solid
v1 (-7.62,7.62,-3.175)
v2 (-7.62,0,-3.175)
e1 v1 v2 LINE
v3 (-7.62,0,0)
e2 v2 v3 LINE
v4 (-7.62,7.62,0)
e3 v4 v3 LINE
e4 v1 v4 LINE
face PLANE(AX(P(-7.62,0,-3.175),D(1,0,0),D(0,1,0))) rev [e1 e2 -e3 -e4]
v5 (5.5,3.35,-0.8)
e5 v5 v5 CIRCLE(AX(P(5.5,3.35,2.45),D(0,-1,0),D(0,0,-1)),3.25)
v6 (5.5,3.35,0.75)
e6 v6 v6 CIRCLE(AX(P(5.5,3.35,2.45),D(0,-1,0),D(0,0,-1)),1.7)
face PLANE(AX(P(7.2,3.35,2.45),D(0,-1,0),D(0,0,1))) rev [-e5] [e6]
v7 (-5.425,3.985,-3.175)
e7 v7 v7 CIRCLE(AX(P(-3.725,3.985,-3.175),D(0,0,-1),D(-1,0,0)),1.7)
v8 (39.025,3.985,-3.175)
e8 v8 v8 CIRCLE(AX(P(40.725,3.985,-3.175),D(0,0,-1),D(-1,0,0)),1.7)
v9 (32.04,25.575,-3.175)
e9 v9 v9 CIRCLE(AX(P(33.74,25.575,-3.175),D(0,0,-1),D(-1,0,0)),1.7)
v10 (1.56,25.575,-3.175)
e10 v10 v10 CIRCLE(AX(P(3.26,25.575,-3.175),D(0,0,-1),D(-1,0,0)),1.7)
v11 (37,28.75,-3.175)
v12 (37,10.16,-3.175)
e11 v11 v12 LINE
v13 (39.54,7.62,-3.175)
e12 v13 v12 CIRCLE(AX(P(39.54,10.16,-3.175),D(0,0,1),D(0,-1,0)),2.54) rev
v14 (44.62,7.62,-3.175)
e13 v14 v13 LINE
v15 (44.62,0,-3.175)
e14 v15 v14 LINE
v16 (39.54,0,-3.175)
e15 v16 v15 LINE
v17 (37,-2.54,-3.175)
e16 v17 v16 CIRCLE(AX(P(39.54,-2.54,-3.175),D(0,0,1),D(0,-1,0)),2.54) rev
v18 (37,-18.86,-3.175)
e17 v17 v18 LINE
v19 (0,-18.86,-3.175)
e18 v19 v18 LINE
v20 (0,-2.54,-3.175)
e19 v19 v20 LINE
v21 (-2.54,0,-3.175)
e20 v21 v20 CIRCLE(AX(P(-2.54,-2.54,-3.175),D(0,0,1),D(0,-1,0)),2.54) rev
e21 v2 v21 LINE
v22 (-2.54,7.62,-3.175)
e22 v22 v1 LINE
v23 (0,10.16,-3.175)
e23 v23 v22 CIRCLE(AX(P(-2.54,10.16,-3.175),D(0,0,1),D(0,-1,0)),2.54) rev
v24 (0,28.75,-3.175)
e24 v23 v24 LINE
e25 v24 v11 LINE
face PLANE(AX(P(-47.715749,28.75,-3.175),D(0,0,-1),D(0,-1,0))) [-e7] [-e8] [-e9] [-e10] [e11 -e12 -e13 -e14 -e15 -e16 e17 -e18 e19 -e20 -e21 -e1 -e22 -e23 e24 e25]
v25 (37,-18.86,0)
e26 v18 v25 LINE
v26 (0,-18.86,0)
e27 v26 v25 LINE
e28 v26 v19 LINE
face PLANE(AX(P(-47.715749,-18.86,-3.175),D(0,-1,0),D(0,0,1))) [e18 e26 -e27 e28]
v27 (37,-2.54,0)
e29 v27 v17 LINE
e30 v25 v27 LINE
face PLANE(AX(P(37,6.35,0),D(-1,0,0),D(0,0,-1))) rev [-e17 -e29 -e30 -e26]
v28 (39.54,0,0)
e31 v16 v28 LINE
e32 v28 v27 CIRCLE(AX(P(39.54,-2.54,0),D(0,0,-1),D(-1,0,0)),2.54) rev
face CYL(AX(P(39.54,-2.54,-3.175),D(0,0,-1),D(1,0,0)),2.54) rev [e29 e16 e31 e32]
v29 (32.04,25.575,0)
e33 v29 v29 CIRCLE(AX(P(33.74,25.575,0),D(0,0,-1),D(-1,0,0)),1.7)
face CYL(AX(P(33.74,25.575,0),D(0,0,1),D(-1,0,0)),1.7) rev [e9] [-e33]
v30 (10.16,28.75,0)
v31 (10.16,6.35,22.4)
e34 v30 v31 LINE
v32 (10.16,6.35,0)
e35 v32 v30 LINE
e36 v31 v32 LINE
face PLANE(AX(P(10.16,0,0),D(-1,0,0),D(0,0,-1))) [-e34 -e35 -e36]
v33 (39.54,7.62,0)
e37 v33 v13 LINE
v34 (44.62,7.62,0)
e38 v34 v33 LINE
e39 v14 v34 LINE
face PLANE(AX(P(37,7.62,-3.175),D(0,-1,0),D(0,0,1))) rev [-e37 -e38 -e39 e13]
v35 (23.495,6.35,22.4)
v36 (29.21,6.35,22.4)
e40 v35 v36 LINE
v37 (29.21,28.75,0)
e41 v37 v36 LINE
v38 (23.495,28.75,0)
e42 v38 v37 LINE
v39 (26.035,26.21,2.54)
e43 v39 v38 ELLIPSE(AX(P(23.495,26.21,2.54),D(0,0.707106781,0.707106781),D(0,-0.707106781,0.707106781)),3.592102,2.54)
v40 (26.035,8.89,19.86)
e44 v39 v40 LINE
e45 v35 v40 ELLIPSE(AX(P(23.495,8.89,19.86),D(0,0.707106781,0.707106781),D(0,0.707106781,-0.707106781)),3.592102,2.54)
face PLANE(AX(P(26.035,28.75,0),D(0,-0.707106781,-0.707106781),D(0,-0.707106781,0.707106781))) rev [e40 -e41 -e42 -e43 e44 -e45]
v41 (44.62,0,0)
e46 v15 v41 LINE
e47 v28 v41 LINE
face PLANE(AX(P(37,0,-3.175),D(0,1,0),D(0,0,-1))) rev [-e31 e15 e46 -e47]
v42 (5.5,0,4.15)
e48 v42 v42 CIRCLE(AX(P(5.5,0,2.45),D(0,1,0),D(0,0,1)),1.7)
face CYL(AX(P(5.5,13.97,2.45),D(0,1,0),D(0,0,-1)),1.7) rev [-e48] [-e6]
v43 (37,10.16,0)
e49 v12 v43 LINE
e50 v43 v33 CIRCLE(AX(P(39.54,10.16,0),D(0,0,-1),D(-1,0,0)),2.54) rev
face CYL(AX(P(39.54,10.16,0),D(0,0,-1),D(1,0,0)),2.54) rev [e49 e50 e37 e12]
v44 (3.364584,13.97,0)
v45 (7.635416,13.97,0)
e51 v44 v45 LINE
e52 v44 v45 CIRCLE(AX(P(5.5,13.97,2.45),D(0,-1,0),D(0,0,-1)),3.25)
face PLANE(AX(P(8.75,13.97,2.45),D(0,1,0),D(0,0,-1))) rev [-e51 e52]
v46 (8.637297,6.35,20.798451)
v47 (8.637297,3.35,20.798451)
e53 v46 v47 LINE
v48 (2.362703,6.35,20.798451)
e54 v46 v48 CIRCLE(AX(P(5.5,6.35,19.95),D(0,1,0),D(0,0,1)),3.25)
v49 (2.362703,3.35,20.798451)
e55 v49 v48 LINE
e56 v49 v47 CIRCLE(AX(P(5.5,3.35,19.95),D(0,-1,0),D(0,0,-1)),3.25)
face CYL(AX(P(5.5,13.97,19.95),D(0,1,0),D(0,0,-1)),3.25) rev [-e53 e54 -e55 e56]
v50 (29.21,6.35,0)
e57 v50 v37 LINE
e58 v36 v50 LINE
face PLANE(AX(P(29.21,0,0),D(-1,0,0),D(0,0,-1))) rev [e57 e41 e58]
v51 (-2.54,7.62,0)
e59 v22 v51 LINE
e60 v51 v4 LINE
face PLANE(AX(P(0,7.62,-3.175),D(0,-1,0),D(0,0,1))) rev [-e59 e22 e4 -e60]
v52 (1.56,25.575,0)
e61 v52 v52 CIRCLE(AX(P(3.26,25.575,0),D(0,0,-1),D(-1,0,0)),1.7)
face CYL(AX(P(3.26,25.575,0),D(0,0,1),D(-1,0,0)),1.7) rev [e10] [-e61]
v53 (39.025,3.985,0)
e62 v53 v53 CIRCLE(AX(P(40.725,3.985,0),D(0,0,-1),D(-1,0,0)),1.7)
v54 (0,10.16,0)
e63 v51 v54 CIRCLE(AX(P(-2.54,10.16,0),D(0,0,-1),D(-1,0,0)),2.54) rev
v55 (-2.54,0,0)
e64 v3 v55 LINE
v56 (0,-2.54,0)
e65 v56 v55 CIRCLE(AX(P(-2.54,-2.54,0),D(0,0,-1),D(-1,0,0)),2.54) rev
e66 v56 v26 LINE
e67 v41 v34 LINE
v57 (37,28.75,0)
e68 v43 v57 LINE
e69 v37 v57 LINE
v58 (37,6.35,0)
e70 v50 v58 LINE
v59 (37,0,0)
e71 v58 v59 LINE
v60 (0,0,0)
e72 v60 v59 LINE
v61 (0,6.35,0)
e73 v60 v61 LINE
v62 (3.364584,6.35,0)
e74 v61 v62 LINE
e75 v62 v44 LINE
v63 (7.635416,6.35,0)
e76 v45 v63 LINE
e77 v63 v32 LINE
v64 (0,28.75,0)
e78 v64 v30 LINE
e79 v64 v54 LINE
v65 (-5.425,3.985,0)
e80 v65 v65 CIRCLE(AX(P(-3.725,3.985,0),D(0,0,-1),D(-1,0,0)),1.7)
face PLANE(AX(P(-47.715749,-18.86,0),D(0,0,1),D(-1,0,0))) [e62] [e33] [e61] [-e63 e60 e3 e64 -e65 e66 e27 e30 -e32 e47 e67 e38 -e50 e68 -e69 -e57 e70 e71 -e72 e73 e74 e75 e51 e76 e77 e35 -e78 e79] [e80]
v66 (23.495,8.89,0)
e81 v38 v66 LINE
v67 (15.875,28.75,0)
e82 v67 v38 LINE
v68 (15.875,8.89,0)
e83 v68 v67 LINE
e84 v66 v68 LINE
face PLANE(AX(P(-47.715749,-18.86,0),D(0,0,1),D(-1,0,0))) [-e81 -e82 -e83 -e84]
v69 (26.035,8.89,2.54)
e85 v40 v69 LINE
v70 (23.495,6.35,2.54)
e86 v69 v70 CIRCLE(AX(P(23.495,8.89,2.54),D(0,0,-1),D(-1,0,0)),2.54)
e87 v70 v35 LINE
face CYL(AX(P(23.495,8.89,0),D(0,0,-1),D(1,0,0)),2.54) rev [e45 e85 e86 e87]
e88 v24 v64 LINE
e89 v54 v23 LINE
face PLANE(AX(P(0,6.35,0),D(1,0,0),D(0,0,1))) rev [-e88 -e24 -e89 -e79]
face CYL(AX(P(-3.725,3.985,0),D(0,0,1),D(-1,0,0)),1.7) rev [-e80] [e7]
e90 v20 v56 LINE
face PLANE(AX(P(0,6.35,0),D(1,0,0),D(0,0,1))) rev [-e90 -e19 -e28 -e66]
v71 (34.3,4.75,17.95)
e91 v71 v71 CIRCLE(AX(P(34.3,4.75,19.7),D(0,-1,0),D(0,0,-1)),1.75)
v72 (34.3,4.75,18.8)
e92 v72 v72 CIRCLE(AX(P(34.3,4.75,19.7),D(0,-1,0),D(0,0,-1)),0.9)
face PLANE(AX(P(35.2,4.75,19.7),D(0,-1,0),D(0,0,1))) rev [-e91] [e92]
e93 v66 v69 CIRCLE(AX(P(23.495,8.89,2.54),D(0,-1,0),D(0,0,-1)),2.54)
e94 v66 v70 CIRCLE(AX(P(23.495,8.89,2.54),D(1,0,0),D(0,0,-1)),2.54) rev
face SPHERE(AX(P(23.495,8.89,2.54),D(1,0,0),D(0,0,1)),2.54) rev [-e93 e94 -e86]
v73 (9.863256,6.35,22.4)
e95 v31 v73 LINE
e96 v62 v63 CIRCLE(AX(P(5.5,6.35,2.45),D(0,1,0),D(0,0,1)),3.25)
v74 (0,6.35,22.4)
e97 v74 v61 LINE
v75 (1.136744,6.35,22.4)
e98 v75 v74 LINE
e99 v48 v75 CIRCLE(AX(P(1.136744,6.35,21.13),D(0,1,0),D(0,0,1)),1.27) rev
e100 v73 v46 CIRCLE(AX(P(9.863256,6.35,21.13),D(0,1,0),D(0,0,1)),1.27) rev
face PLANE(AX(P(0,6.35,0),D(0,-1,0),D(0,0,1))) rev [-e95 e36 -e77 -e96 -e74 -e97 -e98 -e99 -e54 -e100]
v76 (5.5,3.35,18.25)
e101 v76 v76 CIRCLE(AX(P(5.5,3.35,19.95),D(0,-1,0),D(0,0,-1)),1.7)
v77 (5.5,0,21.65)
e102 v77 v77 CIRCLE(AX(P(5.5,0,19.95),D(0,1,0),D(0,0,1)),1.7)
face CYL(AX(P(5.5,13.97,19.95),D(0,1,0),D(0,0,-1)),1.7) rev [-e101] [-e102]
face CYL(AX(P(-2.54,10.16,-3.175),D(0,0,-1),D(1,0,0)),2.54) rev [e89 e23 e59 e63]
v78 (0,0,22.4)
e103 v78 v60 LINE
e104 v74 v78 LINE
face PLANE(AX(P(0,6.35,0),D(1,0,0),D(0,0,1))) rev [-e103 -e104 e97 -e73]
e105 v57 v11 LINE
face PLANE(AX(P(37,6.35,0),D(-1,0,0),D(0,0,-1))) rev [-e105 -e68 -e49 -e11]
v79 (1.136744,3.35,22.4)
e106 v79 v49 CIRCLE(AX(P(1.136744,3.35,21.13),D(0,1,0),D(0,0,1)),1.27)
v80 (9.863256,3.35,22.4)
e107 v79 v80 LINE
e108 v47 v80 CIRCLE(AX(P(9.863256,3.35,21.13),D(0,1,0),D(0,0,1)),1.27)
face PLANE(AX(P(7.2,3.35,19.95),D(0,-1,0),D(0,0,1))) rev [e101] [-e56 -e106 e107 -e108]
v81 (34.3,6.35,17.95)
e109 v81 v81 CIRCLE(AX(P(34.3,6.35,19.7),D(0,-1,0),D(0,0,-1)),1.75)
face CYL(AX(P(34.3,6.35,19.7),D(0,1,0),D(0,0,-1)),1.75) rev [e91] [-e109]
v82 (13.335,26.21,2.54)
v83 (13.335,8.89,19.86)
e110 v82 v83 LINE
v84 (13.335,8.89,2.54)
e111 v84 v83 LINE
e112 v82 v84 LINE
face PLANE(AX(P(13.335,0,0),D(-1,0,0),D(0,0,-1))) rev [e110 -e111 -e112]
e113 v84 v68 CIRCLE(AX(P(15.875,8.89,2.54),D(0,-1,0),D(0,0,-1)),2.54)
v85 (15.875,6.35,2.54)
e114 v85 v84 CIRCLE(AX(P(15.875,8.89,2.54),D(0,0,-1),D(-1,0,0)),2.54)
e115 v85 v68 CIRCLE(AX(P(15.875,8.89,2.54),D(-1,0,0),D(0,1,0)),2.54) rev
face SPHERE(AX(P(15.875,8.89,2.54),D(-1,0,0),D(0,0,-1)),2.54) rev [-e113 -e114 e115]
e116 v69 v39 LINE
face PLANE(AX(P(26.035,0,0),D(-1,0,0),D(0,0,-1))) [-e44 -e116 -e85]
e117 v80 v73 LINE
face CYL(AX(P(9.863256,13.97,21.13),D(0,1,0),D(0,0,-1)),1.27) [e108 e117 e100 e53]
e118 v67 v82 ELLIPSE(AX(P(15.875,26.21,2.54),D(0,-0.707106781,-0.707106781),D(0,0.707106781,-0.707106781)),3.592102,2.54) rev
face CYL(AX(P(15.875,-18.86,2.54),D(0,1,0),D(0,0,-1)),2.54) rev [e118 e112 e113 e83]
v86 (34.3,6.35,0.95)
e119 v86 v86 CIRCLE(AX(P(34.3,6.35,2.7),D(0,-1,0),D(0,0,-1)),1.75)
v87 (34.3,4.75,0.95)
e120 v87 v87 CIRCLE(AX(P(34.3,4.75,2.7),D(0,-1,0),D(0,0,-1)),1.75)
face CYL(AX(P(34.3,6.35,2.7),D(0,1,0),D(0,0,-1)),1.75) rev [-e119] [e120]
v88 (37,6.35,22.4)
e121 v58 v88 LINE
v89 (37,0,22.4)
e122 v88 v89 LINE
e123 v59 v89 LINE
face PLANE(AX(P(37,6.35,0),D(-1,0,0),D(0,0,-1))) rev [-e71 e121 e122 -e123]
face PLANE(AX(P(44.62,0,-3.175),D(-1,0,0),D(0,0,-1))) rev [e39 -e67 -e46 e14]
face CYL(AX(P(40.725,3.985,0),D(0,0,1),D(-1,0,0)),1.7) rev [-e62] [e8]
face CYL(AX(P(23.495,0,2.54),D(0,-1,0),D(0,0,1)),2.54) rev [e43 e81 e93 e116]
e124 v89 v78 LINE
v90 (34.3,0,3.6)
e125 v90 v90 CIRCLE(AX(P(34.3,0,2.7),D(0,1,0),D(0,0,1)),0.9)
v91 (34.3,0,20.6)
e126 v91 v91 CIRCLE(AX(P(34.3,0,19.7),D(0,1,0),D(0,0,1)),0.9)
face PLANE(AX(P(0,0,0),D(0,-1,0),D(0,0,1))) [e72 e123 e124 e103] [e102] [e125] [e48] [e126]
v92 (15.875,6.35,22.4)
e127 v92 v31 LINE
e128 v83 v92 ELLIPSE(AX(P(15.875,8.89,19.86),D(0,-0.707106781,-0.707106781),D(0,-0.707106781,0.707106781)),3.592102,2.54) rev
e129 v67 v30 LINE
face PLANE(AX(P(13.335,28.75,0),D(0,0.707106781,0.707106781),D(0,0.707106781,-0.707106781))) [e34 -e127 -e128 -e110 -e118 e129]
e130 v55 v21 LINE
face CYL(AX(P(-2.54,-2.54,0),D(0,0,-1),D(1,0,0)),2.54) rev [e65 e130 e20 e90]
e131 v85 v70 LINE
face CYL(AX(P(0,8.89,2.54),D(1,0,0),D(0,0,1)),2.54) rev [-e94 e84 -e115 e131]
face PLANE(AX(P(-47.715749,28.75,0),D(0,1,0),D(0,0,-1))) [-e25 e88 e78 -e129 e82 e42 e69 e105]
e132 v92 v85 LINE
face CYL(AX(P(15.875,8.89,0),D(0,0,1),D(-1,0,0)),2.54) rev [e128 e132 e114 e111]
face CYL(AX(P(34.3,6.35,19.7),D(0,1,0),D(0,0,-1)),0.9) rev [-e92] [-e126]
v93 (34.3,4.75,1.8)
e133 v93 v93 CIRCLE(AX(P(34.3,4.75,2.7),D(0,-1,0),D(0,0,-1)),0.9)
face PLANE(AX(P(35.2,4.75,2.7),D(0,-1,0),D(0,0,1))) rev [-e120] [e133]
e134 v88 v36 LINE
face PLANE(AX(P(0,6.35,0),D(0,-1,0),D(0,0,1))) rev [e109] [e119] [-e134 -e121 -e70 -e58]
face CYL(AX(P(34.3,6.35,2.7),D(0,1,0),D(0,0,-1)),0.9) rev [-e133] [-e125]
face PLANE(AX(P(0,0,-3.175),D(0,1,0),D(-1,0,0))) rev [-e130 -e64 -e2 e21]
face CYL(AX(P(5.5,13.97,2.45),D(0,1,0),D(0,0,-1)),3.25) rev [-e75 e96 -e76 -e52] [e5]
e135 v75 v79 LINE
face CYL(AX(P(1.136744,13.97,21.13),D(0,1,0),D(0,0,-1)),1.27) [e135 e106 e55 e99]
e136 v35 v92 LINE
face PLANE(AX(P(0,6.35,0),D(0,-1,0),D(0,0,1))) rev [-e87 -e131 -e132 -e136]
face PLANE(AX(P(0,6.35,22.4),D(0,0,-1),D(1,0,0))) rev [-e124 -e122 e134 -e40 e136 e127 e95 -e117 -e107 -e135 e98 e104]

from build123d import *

# Parameters (mm, degrees)
SKETCH1_W                        = 37
SKETCH1_H                        = 22.4
BOSS_EXTRUDE1_DEPTH              = 6.35
SKETCH7_W                        = 3.175
SKETCH7_H                        = 47.610000126
BOSS_EXTRUDE2_DEPTH              = 37
CBORE_FOR_M3_SHCS3_AT_2_COUNT    = 2
CBORE_FOR_M3_SHCS3_AT_2_PITCH    = 17.5
CBORE_FOR_M1_6_SHCS1_D           = 1.8
CBORE_FOR_M1_6_SHCS1_CBORE_D     = 3.5
CBORE_FOR_M1_6_SHCS1_CBORE_DEPTH = 1.6
BOSS_EXTRUDE3_START              = -10.16
BOSS_EXTRUDE3_DEPTH              = 3.175
BOSS_EXTRUDE4_START              = -29.21
BOSS_EXTRUDE4_DEPTH              = 3.175
SKETCH18_W                       = 7.62
SKETCH18_H                       = 7.62
BOSS_EXTRUDE5_DEPTH              = 3.175
M3_CLEARANCE_HOLE1_D             = 3.4
FILLET1_R                        = 2.54
FILLET2_R                        = 1.27


with BuildPart() as part:
    # Sketch1 → Boss-Extrude1 (new body)
    with BuildSketch(Plane(origin=(0, 0, 0), x_dir=(1, 0, 0), z_dir=(0, 1, 0))):
        with Locations((18.5, 11.2)):
            Rectangle(SKETCH1_W, SKETCH1_H)
    extrude(amount=BOSS_EXTRUDE1_DEPTH)

    # Sketch7 → Boss-Extrude2 (add)
    with BuildSketch(Plane(origin=(37, 0, 0), x_dir=(0, 0, -1), z_dir=(1, 0, 0))):
        with Locations((-1.5875, 4.944999937)):
            Rectangle(SKETCH7_W, SKETCH7_H)
    extrude(amount=-BOSS_EXTRUDE2_DEPTH)

    # Sketch13 → CBORE for M3 SHCS3 (revolve, cut)
    with BuildSketch(Plane(origin=(5.5, 13.97, -2.45), x_dir=(0, 0, 1), z_dir=(1, 0, 0))):
        Polygon((0, 0), (0, 32.830000126), (1.7, 32.830000126), (1.7, 10.62), (3.25, 10.62), (3.25, 0), align=None)
    cbore_for_m3_shcs3 = revolve(axis=Axis((5.5, 20.32, -2.45), (0, -1, 0)), mode=Mode.SUBTRACT)

    # CBORE for M3 SHCS3 at 2: CBORE for M3 SHCS3 ×2
    with Locations(*[(0, 0, -i * CBORE_FOR_M3_SHCS3_AT_2_PITCH) for i in range(1, CBORE_FOR_M3_SHCS3_AT_2_COUNT)]):
        add(cbore_for_m3_shcs3, mode=Mode.SUBTRACT)

    # CBORE for M1.6 SHCS1 (through all)
    with Locations(Plane(origin=(0, 6.35, 0), x_dir=(1, 0, 0), z_dir=(0, 1, 0))):
        with Locations((34.3, 19.7), (34.3, 2.7)):
            CounterBoreHole(CBORE_FOR_M1_6_SHCS1_D / 2, CBORE_FOR_M1_6_SHCS1_CBORE_D / 2, CBORE_FOR_M1_6_SHCS1_CBORE_DEPTH)

    # Sketch16 → Boss-Extrude3 (add)
    with BuildSketch(Plane.ZY.offset(BOSS_EXTRUDE3_START)):
        Polygon((-22.4, 6.35), (0, 6.35), (0, 28.75), align=None)
    extrude(amount=-BOSS_EXTRUDE3_DEPTH)

    # Sketch16<2> → Boss-Extrude4 (add)
    with BuildSketch(Plane.ZY.offset(BOSS_EXTRUDE4_START)):
        Polygon((-22.4, 6.35), (0, 6.35), (0, 28.75), align=None)
    extrude(amount=BOSS_EXTRUDE4_DEPTH)

    # Sketch18 → Boss-Extrude5 (add, through all)
    with BuildSketch(Plane.XY):
        with Locations((40.81, 3.81)):
            Rectangle(SKETCH18_W, SKETCH18_H)
        with Locations((-3.81, 3.81)):
            Rectangle(SKETCH18_W, SKETCH18_H)
    extrude(amount=BOSS_EXTRUDE5_DEPTH)

    # M3 Clearance Hole1 (through all)
    with Locations(Plane(origin=(0, 0, 0), x_dir=(-1, 0, 0), z_dir=(0, 0, -1))):
        with Locations((-40.725, 3.985), (-33.74, 25.575), (-3.26, 25.575), (3.725, 3.985)):
            Hole(M3_CLEARANCE_HOLE1_D / 2)

    # Fillet1
    # the kernel refuses this fillet: 2.54 mm, written as the material it adds along each edge
    with BuildSketch(Plane(origin=(15.875, 8.89, -2.54), x_dir=(0, -1, 0), z_dir=(-1, 0, 0))) as fillet1_piece_1_section:
        Polygon((0, 0), (FILLET1_R, 0), (FILLET1_R, FILLET1_R), (0, FILLET1_R), align=None)
    fillet1_piece_1 = extrude(amount=FILLET1_R, mode=Mode.PRIVATE)
    fillet1_piece_1 = fillet1_piece_1 - Plane(origin=(15.875, 8.89, -2.54), x_dir=(0, 0.7071067811865475, -0.7071067811865475), z_dir=(-1, 0, 0)) * Sphere(FILLET1_R, mode=Mode.PRIVATE)
    add(fillet1_piece_1)
    with BuildSketch(Plane(origin=(23.495, 8.89, -2.54), x_dir=(1, 0, 0), z_dir=(0, -1, 0))) as fillet1_piece_2_section:
        Polygon((0, 0), (FILLET1_R, 0), (FILLET1_R, FILLET1_R), (0, FILLET1_R), align=None)
    fillet1_piece_2 = extrude(amount=FILLET1_R, mode=Mode.PRIVATE)
    fillet1_piece_2 = fillet1_piece_2 - Plane(origin=(23.495, 8.89, -2.54), x_dir=(-0.7071067811865475, 0, -0.7071067811865475), z_dir=(0, -1, 0)) * Sphere(FILLET1_R, mode=Mode.PRIVATE)
    add(fillet1_piece_2)
    with BuildSketch(Plane(origin=(0, 0, 0), x_dir=(0, -1, 0), z_dir=(0, 0, 1)), Plane(origin=(37, 7.62, 0), x_dir=(0, 1, 0), z_dir=(0, 0, 1))) as fillet1_piece_3:
        with BuildLine():
            CenterArc((FILLET1_R, -FILLET1_R), FILLET1_R, 90, 90)
            Line((0, -FILLET1_R), (0, 0))
            Line((0, 0), (FILLET1_R, 0))
        make_face()
    extrude(amount=3.175)
    with BuildSketch(Plane(origin=(0, 7.62, 0), x_dir=(0, 1, 0), z_dir=(0, 0, 1)), Plane(origin=(37, 0, 0), x_dir=(0, -1, 0), z_dir=(0, 0, 1))) as fillet1_piece_4:
        with BuildLine():
            CenterArc((FILLET1_R, FILLET1_R), FILLET1_R, 180, 90)
            Line((0, FILLET1_R), (0, 0))
            Line((0, 0), (FILLET1_R, 0))
        make_face()
    extrude(amount=3.175)
    with BuildSketch(Plane(origin=(15.875, 6.35, 0), x_dir=(0, 0, -1), z_dir=(1, 0, 0))) as fillet1_piece_5:
        with BuildLine():
            CenterArc((FILLET1_R, FILLET1_R), FILLET1_R, 180, 90)
            Line((0, FILLET1_R), (0, 0))
            Line((0, 0), (FILLET1_R, 0))
        make_face()
    extrude(amount=7.62)
    with BuildSketch(Plane(origin=(13.335, 8.89, 0), x_dir=(1, 0, 0), z_dir=(0, 1, 0))) as fillet1_piece_6_section:
        with BuildLine():
            CenterArc((FILLET1_R, FILLET1_R), FILLET1_R, 180, 90)
            Line((0, FILLET1_R), (0, 0))
            Line((0, 0), (FILLET1_R, 0))
        make_face()
    fillet1_piece_6 = extrude(amount=19.86, mode=Mode.PRIVATE)
    fillet1_piece_6 = split(fillet1_piece_6, bisect_by=Plane(origin=(13.919159385, 23.364808453, -5.385191547), z_dir=(0, -0.7071067811865476, 0.7071067811865476)), keep=Keep.TOP, mode=Mode.PRIVATE)
    add(fillet1_piece_6)
    with BuildSketch(Plane(origin=(13.335, 6.35, -22.4), x_dir=(1, 0, 0), z_dir=(0, 0, 1))) as fillet1_piece_7_section:
        with BuildLine():
            CenterArc((FILLET1_R, FILLET1_R), FILLET1_R, 180, 90)
            Line((0, FILLET1_R), (0, 0))
            Line((0, 0), (FILLET1_R, 0))
        make_face()
    fillet1_piece_7 = extrude(amount=19.86, mode=Mode.PRIVATE)
    fillet1_piece_7 = split(fillet1_piece_7, bisect_by=Plane(origin=(13.919159385, 11.735191547, -17.014808453), z_dir=(0, -0.7071067811865476, 0.7071067811865476)), keep=Keep.TOP, mode=Mode.PRIVATE)
    add(fillet1_piece_7)
    with BuildSketch(Plane(origin=(26.035, 6.35, -22.4), x_dir=(-1, 0, 0), z_dir=(0, 0, 1))) as fillet1_piece_8_section:
        with BuildLine():
            CenterArc((FILLET1_R, -FILLET1_R), FILLET1_R, 90, 90)
            Line((0, -FILLET1_R), (0, 0))
            Line((0, 0), (FILLET1_R, 0))
        make_face()
    fillet1_piece_8 = extrude(amount=19.86, mode=Mode.PRIVATE)
    fillet1_piece_8 = split(fillet1_piece_8, bisect_by=Plane(origin=(25.450840615, 11.735191547, -17.014808453), z_dir=(0, -0.7071067811865476, 0.7071067811865476)), keep=Keep.TOP, mode=Mode.PRIVATE)
    add(fillet1_piece_8)
    with BuildSketch(Plane(origin=(26.035, 8.89, 0), x_dir=(-1, 0, 0), z_dir=(0, 1, 0))) as fillet1_piece_9_section:
        with BuildLine():
            CenterArc((FILLET1_R, -FILLET1_R), FILLET1_R, 90, 90)
            Line((0, -FILLET1_R), (0, 0))
            Line((0, 0), (FILLET1_R, 0))
        make_face()
    fillet1_piece_9 = extrude(amount=19.86, mode=Mode.PRIVATE)
    fillet1_piece_9 = split(fillet1_piece_9, bisect_by=Plane(origin=(25.450840615, 23.364808453, -5.385191547), z_dir=(0, -0.7071067811865476, 0.7071067811865476)), keep=Keep.TOP, mode=Mode.PRIVATE)
    add(fillet1_piece_9)

    # Fillet2
    fillet2_edges = [part.edges().sort_by_distance(p)[0] for p in [
        (7.63541565, 4.85, -22.4),
        (3.36458435, 4.85, -22.4),
    ]]
    fillet(fillet2_edges, radius=FILLET2_R)


with BuildPart() as body_2:
    # Mirror1: mirrored copy
    add(part.part.mirror(Plane.XY))


solid = body_2.part
